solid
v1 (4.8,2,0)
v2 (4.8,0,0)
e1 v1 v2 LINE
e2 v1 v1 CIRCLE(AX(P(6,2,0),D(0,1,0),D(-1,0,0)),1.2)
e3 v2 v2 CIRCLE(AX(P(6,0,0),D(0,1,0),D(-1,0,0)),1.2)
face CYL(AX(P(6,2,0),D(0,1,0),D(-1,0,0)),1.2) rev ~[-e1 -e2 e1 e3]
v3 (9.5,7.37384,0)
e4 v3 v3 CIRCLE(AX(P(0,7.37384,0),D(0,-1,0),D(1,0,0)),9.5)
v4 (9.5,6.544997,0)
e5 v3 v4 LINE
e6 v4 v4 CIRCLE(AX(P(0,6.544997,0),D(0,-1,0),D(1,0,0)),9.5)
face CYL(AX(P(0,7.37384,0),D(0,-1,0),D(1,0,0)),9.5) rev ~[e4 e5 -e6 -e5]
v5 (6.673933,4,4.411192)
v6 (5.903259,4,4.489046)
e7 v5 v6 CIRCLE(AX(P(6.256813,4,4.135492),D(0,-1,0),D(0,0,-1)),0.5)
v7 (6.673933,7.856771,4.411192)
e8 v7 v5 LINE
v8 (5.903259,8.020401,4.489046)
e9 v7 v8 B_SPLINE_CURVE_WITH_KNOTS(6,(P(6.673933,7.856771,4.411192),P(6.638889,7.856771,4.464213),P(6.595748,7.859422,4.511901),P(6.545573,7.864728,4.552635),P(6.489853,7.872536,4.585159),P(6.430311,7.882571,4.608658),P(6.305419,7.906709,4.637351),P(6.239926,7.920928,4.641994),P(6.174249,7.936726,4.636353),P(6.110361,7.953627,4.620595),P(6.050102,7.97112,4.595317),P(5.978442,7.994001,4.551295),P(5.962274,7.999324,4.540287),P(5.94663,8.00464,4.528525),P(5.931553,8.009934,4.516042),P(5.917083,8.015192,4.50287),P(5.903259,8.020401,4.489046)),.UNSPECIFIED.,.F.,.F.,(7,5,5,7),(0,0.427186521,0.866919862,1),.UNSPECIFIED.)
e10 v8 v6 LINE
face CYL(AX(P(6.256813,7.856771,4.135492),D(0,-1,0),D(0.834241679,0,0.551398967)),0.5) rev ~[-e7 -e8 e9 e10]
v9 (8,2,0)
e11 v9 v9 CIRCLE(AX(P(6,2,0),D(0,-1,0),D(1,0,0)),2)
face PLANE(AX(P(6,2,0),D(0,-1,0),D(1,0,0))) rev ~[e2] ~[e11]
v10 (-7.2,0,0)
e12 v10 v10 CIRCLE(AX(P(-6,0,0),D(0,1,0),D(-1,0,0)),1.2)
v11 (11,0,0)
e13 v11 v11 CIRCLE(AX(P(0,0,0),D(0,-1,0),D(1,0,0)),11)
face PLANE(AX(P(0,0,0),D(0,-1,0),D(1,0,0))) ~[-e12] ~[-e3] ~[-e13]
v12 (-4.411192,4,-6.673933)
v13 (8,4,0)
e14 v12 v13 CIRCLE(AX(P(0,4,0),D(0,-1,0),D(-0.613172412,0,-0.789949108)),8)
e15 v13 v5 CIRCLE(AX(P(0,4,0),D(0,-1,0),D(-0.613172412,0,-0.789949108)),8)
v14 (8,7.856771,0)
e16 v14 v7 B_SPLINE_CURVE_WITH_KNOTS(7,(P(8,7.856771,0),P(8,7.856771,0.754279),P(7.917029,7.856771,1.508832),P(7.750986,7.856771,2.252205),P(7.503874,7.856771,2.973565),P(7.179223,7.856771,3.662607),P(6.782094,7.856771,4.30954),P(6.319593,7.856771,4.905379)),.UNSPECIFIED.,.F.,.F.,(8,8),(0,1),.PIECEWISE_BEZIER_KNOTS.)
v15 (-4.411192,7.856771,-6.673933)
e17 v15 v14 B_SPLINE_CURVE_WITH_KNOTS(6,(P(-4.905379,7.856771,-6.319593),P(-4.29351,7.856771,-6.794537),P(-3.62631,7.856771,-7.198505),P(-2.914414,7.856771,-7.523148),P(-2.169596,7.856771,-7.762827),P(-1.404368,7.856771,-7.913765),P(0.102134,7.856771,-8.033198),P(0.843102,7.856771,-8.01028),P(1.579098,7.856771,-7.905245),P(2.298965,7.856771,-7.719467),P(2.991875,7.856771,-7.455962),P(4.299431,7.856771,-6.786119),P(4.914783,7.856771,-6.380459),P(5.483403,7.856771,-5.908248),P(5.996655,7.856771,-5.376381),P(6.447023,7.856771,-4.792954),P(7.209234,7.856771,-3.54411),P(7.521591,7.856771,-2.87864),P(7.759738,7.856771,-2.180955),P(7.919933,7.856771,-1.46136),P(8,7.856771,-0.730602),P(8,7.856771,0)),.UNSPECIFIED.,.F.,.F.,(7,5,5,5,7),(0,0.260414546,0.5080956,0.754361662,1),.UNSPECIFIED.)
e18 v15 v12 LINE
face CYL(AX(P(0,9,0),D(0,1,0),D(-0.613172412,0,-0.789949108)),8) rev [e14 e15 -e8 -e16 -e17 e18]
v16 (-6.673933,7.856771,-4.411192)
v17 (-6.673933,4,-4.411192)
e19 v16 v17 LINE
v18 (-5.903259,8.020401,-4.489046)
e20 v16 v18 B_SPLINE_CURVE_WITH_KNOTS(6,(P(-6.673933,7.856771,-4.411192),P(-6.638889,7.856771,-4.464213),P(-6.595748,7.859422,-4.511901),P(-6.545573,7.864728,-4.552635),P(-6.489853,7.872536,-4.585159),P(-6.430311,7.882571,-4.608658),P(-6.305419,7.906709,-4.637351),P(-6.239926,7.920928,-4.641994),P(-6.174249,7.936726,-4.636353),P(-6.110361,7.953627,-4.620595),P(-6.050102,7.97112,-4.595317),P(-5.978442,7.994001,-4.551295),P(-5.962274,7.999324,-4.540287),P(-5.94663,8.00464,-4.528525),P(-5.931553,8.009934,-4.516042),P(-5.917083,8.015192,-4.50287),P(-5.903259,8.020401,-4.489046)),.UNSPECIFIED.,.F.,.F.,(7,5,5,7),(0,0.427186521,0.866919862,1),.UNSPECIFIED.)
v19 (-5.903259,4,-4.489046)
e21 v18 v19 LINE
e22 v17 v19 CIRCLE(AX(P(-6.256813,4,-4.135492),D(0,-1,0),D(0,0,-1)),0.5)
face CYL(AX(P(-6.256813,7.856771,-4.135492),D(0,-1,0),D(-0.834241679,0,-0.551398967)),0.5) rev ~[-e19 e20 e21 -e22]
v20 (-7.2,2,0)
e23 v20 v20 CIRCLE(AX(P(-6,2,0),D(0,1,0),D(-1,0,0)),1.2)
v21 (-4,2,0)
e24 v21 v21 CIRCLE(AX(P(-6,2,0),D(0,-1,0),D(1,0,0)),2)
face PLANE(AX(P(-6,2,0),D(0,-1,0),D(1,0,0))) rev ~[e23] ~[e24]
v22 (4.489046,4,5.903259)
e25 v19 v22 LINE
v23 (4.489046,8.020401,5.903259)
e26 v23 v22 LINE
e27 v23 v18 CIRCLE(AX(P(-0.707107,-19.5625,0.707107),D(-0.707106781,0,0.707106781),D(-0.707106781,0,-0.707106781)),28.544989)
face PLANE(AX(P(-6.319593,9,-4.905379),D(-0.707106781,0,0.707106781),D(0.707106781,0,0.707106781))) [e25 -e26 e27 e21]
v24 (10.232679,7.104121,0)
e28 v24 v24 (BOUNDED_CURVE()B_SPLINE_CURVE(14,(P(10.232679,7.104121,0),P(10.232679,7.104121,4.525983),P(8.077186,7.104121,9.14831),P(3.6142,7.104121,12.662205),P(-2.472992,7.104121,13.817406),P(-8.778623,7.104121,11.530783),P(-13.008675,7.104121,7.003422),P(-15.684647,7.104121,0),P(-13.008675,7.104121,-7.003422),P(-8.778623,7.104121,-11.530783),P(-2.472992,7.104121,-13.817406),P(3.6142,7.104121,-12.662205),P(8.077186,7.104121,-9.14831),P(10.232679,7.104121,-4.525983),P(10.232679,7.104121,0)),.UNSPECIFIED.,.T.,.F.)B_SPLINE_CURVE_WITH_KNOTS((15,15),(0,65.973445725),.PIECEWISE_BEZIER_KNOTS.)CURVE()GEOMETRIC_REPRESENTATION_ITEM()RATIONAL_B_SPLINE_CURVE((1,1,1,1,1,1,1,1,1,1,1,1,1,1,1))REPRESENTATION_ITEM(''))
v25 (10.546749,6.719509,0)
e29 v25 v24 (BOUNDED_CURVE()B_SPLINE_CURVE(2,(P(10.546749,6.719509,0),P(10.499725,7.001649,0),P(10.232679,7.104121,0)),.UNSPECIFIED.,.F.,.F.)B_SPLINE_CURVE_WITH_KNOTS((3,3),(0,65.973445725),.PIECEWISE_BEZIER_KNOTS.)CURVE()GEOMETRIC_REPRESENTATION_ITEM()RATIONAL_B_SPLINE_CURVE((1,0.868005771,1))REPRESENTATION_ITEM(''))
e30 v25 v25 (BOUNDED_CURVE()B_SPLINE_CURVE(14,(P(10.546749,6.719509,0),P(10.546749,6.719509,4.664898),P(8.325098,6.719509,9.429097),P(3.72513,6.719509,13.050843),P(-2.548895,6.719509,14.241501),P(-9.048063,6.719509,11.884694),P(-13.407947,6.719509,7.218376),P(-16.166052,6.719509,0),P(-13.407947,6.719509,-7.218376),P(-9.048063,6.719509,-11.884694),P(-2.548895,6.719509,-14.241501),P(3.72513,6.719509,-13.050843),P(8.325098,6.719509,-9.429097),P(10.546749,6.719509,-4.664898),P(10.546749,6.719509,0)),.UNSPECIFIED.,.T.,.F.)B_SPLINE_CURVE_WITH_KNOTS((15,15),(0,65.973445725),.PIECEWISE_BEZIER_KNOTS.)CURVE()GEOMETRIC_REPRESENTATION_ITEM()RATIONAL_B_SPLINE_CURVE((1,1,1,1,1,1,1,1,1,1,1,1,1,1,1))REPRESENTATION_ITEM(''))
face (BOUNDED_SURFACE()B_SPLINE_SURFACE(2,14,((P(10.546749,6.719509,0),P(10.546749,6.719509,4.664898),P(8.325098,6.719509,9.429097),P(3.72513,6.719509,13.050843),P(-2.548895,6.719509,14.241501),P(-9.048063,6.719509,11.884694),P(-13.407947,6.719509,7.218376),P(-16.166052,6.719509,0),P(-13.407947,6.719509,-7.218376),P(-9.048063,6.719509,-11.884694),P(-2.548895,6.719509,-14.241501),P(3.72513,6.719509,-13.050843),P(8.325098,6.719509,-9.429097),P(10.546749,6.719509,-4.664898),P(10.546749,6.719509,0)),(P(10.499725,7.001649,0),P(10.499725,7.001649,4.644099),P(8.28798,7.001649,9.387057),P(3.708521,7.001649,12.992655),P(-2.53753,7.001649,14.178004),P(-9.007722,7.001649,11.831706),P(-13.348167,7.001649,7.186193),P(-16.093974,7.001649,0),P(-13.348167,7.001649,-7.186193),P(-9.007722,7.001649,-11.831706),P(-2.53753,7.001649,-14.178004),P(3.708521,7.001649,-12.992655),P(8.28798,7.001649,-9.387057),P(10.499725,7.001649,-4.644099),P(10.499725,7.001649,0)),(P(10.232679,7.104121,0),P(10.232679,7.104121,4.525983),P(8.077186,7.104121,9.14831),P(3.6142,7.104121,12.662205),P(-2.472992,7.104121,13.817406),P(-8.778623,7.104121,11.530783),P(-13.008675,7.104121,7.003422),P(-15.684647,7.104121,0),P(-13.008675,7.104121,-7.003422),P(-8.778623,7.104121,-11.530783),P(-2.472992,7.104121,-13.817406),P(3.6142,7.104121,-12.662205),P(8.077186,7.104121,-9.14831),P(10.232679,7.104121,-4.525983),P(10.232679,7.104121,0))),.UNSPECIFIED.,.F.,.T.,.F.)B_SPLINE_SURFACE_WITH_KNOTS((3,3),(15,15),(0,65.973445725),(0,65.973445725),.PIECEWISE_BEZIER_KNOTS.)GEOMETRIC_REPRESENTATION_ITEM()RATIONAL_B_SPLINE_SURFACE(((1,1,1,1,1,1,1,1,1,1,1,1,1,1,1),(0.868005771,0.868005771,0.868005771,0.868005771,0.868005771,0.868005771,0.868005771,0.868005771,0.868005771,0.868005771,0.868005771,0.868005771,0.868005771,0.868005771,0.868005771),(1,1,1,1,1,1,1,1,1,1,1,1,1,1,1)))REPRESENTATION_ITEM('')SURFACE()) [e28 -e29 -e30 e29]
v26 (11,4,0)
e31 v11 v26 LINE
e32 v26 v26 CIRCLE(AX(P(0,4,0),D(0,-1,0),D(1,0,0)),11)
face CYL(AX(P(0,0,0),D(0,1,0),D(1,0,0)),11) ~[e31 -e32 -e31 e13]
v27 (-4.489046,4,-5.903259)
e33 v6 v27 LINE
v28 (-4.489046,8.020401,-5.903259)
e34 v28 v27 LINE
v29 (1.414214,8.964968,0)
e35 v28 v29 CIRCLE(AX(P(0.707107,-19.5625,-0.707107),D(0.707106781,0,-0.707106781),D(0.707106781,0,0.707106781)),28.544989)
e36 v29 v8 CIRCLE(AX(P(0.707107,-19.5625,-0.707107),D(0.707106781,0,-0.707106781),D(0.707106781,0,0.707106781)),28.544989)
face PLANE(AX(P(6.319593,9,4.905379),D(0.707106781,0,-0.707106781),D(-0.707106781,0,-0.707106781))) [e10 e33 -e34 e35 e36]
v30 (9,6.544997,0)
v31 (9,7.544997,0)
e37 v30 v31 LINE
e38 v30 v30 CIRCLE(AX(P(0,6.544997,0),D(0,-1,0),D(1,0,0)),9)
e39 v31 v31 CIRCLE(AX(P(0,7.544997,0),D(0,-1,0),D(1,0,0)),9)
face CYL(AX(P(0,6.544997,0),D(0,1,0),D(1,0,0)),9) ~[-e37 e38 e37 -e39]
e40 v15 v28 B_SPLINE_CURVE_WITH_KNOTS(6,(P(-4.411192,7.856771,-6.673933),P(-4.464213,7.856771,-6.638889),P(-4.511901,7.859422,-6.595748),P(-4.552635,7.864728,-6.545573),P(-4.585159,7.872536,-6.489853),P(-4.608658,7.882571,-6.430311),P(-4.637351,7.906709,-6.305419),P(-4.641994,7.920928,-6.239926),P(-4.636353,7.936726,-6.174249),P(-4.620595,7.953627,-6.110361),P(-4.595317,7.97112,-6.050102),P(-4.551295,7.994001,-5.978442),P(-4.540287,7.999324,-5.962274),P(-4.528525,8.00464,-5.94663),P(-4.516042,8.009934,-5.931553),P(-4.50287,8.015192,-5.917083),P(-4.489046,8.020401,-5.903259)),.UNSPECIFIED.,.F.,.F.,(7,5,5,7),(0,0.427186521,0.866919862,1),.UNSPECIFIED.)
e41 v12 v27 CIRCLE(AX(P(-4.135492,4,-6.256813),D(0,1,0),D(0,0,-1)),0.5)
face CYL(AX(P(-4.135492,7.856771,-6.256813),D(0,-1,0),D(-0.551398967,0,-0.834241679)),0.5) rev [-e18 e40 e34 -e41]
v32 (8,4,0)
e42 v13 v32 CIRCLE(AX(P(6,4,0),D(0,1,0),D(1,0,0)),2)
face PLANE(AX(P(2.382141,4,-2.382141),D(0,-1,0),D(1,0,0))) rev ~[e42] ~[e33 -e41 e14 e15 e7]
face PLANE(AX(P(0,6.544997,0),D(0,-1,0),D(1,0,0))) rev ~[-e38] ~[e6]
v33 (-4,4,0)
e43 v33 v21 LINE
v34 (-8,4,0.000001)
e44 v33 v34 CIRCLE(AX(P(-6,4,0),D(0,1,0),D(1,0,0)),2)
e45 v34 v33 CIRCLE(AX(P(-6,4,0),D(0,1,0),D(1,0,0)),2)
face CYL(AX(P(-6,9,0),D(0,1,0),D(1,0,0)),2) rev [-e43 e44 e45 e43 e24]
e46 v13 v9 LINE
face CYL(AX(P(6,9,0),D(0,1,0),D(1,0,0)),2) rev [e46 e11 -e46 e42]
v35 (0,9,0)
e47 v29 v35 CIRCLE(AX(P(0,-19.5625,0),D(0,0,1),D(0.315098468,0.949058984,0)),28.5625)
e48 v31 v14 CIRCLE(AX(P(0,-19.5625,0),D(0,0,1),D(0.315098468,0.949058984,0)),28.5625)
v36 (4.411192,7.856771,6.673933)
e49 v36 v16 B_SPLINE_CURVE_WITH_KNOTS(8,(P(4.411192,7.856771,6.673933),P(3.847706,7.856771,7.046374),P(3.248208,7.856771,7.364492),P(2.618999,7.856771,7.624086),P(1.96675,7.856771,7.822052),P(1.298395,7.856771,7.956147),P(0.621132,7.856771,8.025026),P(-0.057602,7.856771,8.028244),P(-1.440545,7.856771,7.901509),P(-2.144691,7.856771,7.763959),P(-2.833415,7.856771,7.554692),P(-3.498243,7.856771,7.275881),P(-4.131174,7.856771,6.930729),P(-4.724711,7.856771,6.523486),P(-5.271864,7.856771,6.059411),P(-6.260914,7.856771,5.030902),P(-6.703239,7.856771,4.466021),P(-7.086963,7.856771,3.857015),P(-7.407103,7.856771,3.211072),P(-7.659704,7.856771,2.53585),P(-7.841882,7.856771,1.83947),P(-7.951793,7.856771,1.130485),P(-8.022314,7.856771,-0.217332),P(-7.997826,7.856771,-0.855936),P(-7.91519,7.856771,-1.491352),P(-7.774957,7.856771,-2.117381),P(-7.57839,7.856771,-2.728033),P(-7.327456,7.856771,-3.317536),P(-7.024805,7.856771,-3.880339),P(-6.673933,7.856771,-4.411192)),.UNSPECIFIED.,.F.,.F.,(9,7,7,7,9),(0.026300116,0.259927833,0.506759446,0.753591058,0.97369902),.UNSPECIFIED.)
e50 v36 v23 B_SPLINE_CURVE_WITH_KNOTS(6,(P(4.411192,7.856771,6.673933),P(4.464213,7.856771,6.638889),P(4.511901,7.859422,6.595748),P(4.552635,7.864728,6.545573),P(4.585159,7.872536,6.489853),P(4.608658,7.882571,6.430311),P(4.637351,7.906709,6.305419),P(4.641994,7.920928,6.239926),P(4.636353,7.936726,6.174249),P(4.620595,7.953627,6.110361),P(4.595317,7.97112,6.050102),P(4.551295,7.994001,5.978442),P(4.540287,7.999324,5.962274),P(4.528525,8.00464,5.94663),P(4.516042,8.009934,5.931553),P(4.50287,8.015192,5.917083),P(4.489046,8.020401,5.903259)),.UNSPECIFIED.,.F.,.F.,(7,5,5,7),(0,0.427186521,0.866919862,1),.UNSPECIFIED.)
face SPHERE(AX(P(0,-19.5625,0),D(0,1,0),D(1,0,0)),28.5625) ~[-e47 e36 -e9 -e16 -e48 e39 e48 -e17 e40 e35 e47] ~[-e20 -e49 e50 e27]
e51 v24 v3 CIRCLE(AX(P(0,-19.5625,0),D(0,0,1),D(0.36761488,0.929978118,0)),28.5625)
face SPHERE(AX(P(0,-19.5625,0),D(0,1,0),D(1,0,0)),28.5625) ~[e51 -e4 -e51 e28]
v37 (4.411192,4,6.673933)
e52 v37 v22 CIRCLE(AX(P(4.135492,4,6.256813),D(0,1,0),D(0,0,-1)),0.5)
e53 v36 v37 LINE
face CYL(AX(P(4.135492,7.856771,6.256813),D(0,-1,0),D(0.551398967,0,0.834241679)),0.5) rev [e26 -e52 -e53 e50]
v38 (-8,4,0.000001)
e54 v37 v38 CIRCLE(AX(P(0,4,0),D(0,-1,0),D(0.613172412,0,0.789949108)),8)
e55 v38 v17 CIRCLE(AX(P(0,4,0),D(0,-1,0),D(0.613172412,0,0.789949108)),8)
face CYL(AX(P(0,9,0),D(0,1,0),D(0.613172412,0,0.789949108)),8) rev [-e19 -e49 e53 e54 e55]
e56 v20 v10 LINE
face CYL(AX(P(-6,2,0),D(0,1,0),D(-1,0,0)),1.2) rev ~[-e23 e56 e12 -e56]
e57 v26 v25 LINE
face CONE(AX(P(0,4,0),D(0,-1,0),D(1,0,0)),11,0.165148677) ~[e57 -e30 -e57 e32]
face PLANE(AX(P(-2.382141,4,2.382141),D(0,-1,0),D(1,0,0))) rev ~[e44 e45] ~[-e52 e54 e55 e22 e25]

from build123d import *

# Parameters (mm, degrees)
F2_R      = 0.5
F5_DEPTH  = 5
F6_R      = 0.5
F7_R      = 2
F8_DEPTH  = 7
F9_R      = 1.2
F10_DEPTH = 25


with BuildPart() as f1:
    # F0 (on Top) → F1 (revolve)
    with BuildSketch(Plane.XY):
        with BuildLine():
            Line((0, 9), (0, 0))
            Line((0, 0), (11, 0))
            Line((11, 0), (11, 4))
            Line((11, 4), (10.5, 7))
            ThreePointArc((10.5, 7), (10.0017468007, 7.1915925315), (9.5, 7.3738398822))
            Line((9.5, 7.3738398822), (9.5, 6.5449972332))
            Line((9.5, 6.5449972332), (9, 6.5449972332))
            Line((9, 6.5449972332), (9, 7.5449972332))
            ThreePointArc((9, 7.5449972332), (4.5584271698, 8.6339031037), (0, 9))
        make_face()
    revolve(axis=Axis((0, 4.5, 0), (0, -1, 0)))

    # F2
    f2_edges = [f1.edges().sort_by_distance(p)[0] for p in [
        (-10.5, 7, 0),
    ]]
    fillet(f2_edges, radius=F2_R)

    # F4 (on offset) → F5 (cut)
    with BuildSketch(Plane.XZ.offset(-9)):
        with BuildLine():
            ThreePointArc((-4.905379299, -6.3195928613), (5.6568542495, -5.6568542495), (6.3195928613, 4.905379299))
            Line((6.3195928613, 4.905379299), (-4.905379299, -6.3195928613))
        make_face()
        with BuildLine():
            Line((-6.3195928613, -4.905379299), (4.905379299, 6.3195928613))
            ThreePointArc((4.905379299, 6.3195928613), (-5.6568542495, 5.6568542495), (-6.3195928613, -4.905379299))
        make_face()
    extrude(amount=F5_DEPTH, mode=Mode.SUBTRACT)

    # F6
    f6_edges = [f1.edges().sort_by_distance(p)[0] for p in [
        (6.319593, 5.928385, 4.905379),
        (-4.905379, 5.928385, -6.319593),
        (-6.319593, 5.928385, -4.905379),
        (4.905379, 5.928385, 6.319593),
    ]]
    fillet(f6_edges, radius=F6_R)

    # F7 (on offset) → F8 (cut)
    with BuildSketch(Plane.XZ.offset(-9)):
        with Locations((6, 0)):
            Circle(F7_R)
        with Locations((-6, 0)):
            Circle(F7_R)
    extrude(amount=F8_DEPTH, mode=Mode.SUBTRACT)

    # F9 (on face) → F10 (cut)
    with BuildSketch(Plane(origin=(0, 2, 0), x_dir=(-1, 0, 0), z_dir=(0, 1, 0))):
        with Locations((-6, 0)):
            Circle(F9_R)
        with Locations((6, 0)):
            Circle(F9_R)
    extrude(amount=-F10_DEPTH, mode=Mode.SUBTRACT)


solid = f1.part
